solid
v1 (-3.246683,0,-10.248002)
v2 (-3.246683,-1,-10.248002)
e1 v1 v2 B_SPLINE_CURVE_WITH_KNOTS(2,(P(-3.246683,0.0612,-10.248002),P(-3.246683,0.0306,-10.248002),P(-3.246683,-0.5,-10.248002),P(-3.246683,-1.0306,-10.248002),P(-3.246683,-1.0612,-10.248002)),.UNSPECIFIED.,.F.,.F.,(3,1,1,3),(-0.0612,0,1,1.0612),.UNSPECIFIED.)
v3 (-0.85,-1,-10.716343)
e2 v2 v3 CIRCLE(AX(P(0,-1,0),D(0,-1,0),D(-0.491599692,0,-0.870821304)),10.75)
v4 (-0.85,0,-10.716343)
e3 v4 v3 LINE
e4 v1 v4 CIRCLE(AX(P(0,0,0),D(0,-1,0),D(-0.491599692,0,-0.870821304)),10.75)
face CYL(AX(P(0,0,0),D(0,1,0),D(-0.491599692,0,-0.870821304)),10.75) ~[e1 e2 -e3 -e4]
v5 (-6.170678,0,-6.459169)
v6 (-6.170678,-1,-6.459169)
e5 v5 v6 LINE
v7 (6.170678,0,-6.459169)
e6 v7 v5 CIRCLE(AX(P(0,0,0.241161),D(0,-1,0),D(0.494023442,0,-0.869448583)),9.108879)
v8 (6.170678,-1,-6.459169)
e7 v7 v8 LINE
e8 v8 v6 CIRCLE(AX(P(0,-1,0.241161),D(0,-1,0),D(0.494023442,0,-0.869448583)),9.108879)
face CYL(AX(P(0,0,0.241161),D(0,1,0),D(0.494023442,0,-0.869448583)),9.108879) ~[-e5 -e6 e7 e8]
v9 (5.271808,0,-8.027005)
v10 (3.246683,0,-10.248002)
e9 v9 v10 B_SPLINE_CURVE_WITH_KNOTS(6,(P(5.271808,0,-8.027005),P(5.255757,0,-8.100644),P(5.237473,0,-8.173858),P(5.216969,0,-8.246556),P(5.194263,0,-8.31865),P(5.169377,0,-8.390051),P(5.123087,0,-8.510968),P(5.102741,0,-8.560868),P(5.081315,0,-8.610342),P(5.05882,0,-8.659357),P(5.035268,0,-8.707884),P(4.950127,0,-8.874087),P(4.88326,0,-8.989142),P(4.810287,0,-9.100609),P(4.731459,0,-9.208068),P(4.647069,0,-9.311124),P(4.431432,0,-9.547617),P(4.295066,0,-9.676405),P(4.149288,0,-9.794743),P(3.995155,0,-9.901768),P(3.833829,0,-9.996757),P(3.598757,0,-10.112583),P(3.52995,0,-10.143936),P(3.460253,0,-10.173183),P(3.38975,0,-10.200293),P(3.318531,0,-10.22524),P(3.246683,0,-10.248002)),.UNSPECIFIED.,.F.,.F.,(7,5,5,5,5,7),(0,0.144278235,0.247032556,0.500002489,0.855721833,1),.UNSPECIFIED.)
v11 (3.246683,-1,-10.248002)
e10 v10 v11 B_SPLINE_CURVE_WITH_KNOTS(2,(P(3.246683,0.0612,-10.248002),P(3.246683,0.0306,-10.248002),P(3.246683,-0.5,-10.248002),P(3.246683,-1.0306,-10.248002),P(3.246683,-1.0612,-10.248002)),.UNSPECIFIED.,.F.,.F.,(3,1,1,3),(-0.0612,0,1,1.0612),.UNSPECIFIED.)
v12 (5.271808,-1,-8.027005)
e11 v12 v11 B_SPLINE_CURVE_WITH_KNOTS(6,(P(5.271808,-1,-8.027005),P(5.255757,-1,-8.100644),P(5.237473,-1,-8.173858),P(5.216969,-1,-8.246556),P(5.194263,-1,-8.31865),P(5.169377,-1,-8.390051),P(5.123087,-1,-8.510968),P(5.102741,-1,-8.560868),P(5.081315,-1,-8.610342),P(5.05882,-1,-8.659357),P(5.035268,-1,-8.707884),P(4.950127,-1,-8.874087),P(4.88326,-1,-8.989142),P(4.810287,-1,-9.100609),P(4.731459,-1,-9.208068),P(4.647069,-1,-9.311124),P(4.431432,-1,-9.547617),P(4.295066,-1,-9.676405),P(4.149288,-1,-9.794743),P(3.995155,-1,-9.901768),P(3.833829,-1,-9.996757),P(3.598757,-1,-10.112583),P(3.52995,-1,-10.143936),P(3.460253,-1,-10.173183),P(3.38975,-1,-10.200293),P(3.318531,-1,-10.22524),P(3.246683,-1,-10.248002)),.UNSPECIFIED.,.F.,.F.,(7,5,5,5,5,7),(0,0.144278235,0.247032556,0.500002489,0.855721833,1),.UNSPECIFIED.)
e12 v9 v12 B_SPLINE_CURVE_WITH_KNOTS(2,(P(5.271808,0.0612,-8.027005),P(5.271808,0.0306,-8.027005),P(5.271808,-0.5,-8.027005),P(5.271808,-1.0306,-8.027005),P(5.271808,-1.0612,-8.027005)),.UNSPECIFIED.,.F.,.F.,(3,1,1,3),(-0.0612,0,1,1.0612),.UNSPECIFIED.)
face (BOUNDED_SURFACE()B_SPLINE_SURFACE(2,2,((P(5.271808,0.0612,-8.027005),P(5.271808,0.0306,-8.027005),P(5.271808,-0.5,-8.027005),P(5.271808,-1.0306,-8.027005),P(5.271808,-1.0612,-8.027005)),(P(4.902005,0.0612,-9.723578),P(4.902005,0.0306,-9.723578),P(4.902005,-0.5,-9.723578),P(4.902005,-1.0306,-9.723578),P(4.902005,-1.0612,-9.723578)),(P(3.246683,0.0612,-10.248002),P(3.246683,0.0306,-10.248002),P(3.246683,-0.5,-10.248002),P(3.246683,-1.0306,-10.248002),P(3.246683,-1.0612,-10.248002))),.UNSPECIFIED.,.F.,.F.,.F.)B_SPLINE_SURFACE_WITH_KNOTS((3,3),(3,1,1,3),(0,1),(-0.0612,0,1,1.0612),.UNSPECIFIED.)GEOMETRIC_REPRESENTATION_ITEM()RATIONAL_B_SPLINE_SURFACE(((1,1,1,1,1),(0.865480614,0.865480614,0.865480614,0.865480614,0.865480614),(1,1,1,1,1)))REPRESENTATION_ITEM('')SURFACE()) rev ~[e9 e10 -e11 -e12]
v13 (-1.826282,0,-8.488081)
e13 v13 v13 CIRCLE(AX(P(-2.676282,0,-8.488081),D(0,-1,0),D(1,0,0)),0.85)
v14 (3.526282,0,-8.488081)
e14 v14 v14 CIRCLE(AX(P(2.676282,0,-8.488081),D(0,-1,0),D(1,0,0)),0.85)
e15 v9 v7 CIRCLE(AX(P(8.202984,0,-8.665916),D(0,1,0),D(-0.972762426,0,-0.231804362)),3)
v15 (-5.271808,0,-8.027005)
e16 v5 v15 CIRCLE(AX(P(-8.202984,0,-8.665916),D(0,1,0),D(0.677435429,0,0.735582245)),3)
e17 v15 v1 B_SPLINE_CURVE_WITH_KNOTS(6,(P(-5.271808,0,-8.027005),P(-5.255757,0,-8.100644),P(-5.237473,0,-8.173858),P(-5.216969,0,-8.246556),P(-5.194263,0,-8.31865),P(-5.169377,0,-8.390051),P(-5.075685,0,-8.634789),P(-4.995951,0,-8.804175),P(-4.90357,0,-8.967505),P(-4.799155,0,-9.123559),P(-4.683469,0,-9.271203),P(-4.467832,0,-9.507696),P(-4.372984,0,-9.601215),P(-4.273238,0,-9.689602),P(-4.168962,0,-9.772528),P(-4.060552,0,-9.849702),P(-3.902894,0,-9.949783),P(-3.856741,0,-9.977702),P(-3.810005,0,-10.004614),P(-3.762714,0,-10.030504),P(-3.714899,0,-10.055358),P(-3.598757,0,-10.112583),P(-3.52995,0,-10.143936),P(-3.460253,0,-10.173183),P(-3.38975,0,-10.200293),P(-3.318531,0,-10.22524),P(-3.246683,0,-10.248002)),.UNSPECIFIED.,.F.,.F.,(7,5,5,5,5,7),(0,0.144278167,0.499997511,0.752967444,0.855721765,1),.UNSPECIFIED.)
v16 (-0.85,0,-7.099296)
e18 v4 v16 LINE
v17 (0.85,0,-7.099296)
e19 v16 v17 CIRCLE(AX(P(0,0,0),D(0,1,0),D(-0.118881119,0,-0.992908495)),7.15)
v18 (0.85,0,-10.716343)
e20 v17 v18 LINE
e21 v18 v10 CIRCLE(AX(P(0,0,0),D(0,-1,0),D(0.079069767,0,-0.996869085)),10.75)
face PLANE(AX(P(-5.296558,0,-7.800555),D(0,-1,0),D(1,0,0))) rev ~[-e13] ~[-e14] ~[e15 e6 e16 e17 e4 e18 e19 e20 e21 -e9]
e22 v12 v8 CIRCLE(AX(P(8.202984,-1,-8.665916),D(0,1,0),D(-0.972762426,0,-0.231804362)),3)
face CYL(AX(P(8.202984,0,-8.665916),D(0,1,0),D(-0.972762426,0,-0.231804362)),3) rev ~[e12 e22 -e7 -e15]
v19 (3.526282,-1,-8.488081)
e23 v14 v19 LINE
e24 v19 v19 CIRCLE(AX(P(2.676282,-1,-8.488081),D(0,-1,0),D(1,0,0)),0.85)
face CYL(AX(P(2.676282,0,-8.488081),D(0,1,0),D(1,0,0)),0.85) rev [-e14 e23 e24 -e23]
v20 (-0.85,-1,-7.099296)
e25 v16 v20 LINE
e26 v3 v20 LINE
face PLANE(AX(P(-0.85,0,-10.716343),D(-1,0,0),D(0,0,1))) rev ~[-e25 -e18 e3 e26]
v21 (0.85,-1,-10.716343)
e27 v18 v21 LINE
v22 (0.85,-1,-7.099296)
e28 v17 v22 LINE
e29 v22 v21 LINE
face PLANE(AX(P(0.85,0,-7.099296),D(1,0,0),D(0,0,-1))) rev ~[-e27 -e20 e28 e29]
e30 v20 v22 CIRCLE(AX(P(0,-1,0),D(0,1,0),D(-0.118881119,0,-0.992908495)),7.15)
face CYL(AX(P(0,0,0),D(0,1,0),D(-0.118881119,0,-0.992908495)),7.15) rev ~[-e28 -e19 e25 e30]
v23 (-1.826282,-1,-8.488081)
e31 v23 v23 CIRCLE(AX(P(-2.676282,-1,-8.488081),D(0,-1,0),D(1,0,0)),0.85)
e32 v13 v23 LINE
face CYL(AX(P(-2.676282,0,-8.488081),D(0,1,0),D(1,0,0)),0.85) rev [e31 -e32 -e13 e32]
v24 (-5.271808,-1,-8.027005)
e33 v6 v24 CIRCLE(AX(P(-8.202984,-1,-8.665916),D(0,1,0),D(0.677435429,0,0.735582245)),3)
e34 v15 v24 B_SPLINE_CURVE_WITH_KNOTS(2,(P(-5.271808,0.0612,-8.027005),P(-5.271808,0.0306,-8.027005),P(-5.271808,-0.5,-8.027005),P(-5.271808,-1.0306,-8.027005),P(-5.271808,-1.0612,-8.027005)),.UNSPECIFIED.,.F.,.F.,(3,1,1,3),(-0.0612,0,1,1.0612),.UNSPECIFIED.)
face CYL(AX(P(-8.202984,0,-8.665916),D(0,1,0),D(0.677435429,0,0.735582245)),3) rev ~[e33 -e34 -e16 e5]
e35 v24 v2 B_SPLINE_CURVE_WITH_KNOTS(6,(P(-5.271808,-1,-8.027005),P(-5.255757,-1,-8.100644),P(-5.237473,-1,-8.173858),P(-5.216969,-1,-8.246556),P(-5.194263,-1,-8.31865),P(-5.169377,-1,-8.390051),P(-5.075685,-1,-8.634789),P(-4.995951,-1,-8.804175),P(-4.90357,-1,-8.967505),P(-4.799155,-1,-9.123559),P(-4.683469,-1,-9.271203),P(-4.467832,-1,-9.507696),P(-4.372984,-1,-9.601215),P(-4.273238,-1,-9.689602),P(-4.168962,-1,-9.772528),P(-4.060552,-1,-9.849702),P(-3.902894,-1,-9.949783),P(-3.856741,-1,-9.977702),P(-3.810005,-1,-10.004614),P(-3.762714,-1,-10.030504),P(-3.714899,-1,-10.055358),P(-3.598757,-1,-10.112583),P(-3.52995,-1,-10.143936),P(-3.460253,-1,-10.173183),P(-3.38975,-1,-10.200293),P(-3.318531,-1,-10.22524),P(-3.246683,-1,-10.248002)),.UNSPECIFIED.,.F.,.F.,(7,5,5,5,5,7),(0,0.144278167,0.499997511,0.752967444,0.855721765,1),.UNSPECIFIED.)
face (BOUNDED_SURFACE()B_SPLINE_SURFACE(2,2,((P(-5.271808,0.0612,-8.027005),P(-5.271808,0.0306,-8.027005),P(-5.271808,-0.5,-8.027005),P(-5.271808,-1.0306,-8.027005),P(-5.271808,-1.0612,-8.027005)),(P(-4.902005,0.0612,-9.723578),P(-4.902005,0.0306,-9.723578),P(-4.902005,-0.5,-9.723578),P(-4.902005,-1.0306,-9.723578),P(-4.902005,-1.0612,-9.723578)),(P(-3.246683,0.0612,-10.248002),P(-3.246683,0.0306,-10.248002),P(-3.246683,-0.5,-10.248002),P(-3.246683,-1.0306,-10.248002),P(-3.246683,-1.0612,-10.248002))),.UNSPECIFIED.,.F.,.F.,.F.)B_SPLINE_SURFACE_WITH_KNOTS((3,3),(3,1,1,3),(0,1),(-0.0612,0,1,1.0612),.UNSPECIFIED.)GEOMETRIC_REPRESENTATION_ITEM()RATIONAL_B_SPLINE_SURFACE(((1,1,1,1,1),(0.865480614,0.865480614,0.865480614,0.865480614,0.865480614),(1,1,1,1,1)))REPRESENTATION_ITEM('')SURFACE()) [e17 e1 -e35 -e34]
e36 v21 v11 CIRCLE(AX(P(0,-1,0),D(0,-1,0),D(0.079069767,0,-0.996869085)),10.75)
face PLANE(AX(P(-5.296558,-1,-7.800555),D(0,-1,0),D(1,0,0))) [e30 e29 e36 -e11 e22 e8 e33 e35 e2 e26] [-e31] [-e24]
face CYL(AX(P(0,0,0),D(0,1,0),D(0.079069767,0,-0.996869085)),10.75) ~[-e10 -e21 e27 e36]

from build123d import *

# Parameters (mm, degrees)
F0_R        = 0.85
F1_DEPTH    = 1
F2_T1_DEPTH = 1
F3_R        = 3


# Not quite as in the source:
# - a fillet or chamfer that OpenCascade refuses, or shapes differently, is made with other operations: its cross-section is extruded or revolved along the edge and cut away or added


with BuildPart() as f1:
    # F0 (on Front) → F1 (new body)
    with BuildSketch(Plane.XZ):
        with BuildLine():
            ThreePointArc((-0.85, -7.0992957397), (0, 7.15), (0.85, -7.0992957397))
            Line((0.85, -7.0992957397), (0.85, -10.7163426597))
            ThreePointArc((0.85, -10.7163426597), (3.1412802118, -10.2808004859), (5.2846966911, -9.3613290127))
            Line((5.2846966911, -9.3613290127), (4.5, -7.6785415282))
            ThreePointArc((4.5, -7.6785415282), (0, 9.3500403242), (-4.5, -7.6785415282))
            Line((-4.5, -7.6785415282), (-5.2846966911, -9.3613290127))
            ThreePointArc((-5.2846966911, -9.3613290127), (-3.1412802118, -10.2808004859), (-0.85, -10.7163426597))
            Line((-0.85, -10.7163426597), (-0.85, -7.0992957397))
        make_face()
        with Locations((-2.6762816156, -8.4880808617)):
            Circle(F0_R, mode=Mode.SUBTRACT)
        with Locations((2.6762816156, -8.4880808617)):
            Circle(F0_R, mode=Mode.SUBTRACT)
    extrude(amount=F1_DEPTH)

    # F2: fillet of radius 3 on 2 edges, made by hand

    # F2_s2 → F2_t1 (join)
    with BuildSketch(Plane.XZ):
        with BuildLine():
            ThreePointArc((-6.170677683, -6.4591691909), (-5.3337110531, -7.7899747588), (-5.2846966911, -9.3613290127))
            Line((-5.2846966911, -9.3613290127), (-4.5, -7.6785415282))
            ThreePointArc((-4.5, -7.6785415282), (-5.3700612452, -7.1164289704), (-6.170677683, -6.4591691909))
        make_face()
        with BuildLine():
            ThreePointArc((5.2846966911, -9.3613290127), (5.3337110531, -7.7899747588), (6.170677683, -6.4591691909))
            ThreePointArc((6.170677683, -6.4591691909), (5.3700612452, -7.1164289704), (4.5, -7.6785415282))
            Line((4.5, -7.6785415282), (5.2846966911, -9.3613290127))
        make_face()
    extrude(amount=F2_T1_DEPTH)

    # F3
    f3_edges = [f1.edges().sort_by_distance(p)[0] for p in [
        (-5.284697, -0.5, -9.361329),
        (5.284697, -0.5, -9.361329),
    ]]
    fillet(f3_edges, radius=F3_R)


solid = f1.part
